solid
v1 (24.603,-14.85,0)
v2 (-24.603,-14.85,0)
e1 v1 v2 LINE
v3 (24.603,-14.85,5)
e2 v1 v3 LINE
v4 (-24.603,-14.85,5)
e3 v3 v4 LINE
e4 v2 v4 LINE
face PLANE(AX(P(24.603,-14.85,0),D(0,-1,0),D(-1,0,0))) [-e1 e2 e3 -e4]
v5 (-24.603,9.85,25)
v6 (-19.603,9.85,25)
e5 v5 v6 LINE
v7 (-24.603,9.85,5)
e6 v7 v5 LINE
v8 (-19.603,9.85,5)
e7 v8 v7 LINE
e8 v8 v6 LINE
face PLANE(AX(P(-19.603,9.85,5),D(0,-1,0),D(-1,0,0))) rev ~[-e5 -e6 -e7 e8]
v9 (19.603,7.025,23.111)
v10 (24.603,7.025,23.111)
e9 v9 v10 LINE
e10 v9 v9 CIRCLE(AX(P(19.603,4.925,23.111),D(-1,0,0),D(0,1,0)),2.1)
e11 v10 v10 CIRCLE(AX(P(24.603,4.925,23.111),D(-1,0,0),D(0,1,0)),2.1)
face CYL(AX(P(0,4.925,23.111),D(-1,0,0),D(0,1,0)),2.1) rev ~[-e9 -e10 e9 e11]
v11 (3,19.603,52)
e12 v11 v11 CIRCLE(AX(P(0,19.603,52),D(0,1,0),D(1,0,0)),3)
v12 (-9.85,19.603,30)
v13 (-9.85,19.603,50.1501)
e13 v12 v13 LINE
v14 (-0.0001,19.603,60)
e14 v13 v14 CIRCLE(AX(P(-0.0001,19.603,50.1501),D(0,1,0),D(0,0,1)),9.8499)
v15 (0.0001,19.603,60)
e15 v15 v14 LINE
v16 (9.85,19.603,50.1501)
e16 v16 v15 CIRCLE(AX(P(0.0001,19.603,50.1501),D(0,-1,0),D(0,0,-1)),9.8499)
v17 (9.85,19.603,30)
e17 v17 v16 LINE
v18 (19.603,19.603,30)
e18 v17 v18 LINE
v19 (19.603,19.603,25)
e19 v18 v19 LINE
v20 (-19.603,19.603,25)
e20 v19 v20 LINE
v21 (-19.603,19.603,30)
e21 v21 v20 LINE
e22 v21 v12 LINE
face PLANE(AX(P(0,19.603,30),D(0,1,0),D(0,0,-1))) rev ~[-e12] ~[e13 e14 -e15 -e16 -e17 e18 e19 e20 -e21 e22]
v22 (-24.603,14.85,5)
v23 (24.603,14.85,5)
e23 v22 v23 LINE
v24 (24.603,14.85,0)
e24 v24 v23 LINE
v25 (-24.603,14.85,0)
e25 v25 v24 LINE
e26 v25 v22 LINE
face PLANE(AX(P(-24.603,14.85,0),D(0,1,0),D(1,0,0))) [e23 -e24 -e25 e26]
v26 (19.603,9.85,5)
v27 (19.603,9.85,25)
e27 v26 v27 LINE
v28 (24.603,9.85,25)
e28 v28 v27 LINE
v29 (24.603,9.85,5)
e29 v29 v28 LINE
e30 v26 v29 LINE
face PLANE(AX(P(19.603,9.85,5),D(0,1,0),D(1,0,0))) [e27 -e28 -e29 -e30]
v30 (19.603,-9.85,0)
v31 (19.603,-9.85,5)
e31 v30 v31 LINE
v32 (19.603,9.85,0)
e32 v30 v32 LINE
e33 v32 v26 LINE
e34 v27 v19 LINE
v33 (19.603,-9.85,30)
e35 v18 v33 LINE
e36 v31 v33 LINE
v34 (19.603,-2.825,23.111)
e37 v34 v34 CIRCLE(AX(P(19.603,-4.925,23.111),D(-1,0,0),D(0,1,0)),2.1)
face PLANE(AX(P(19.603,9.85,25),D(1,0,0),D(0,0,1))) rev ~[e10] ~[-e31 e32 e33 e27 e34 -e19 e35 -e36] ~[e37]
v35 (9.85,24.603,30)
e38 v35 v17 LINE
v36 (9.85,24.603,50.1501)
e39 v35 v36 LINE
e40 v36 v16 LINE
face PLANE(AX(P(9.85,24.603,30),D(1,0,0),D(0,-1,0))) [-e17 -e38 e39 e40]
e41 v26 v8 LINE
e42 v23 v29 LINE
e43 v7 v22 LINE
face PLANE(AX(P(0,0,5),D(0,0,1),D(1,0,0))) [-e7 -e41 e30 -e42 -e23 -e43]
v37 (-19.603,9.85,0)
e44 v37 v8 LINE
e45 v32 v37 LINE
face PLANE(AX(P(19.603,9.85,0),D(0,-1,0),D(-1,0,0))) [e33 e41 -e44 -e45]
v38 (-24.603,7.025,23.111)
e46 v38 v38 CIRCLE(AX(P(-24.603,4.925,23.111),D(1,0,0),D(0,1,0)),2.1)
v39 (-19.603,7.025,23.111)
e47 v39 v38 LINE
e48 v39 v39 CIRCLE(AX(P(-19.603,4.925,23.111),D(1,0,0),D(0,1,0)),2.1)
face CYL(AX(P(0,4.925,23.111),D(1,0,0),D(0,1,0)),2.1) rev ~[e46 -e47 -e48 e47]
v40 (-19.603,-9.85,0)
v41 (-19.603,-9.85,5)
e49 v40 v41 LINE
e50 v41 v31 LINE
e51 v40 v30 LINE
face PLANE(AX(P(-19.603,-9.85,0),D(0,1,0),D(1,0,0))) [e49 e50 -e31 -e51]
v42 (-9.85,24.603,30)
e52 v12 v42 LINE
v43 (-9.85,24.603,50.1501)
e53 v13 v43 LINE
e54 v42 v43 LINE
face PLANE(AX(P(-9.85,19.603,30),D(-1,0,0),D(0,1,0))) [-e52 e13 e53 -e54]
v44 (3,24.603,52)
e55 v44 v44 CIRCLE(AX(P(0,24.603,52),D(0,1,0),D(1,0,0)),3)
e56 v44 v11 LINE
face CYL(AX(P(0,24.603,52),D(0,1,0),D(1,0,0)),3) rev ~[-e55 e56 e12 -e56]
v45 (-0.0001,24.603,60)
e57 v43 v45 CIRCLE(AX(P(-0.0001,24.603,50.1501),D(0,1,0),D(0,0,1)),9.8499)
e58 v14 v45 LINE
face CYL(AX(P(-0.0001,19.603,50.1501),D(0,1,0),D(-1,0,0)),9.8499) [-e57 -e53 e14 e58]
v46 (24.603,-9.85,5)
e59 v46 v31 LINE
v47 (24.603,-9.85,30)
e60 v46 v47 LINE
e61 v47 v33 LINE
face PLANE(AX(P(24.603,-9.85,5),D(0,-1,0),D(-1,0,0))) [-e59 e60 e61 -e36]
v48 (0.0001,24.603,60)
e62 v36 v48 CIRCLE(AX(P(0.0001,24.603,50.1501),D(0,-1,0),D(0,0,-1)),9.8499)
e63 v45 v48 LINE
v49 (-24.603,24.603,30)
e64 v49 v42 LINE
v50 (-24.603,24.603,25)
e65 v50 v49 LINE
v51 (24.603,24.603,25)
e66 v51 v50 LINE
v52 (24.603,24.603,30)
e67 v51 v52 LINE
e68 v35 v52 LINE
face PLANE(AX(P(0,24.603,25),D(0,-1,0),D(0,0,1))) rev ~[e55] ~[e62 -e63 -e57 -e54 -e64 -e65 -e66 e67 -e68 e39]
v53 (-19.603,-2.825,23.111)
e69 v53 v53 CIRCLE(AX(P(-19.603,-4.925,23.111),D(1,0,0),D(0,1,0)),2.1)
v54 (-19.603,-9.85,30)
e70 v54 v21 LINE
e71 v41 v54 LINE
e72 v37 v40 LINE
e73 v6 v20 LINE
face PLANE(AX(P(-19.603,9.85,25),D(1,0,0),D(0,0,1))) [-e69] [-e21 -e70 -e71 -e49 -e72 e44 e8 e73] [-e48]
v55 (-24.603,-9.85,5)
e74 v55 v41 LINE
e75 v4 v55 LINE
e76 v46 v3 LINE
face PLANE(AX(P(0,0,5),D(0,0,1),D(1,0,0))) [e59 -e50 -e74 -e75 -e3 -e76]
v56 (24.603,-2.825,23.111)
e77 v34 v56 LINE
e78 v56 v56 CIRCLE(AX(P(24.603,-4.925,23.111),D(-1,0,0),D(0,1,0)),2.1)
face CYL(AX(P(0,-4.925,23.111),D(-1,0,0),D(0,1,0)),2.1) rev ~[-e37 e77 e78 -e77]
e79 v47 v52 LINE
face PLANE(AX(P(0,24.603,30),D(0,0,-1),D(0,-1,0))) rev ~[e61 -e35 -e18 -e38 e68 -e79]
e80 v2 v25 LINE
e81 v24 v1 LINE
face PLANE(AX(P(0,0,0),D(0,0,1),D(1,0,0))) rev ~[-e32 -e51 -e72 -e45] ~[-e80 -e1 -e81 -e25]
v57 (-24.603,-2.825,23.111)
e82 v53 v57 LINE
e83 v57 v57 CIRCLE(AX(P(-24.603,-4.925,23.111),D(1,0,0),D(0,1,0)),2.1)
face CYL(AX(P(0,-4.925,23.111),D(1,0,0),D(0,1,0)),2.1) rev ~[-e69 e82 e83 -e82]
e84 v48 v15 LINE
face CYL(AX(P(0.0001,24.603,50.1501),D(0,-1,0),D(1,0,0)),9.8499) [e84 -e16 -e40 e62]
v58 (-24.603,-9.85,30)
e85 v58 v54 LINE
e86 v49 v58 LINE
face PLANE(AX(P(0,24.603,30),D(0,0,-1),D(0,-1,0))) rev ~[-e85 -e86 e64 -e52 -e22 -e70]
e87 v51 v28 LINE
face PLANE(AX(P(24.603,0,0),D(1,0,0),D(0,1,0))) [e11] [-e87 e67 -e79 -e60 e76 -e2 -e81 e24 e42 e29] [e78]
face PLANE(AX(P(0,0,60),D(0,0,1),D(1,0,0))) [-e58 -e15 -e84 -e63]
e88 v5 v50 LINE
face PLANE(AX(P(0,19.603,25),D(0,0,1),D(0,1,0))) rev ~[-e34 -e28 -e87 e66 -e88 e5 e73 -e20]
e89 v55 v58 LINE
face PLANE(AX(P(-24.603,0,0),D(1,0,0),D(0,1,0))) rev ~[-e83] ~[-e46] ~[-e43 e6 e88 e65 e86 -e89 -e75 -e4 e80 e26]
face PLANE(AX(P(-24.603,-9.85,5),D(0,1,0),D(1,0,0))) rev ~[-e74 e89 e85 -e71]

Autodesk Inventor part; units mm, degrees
ref_plane "YZ Plane" through (0, 0, 0) normal (1, 0, 0) x (0, 1, 0)
ref_plane "XZ Plane" through (0, 0, 0) normal (0, 1, 0) x (-1, 0, 0)
ref_plane "XY Plane" through (0, 0, 0) normal (0, 0, 1) x (1, 0, 0)
sketch "Sketch1" plane through (0, 0, 0) normal (0, 0, 1) x (1, 0, 0)
  line L0 (-19.603, -9.85) -> (19.603, -9.85)
  line L1 (19.603, -9.85) -> (19.603, 9.85)
  line L2 (19.603, 9.85) -> (-19.603, 9.85)
  line L3 (-19.603, 9.85) -> (-19.603, -9.85)
  line L4 (-19.603, -9.85) -> (19.603, 9.85) construction
  line L5 (19.603, -9.85) -> (-19.603, 9.85) construction
  line L6 (-24.603, 14.85) -> (24.603, 14.85)
  line L7 (24.603, 14.85) -> (24.603, -14.85)
  line L8 (24.603, -14.85) -> (-24.603, -14.85)
  line L9 (-24.603, -14.85) -> (-24.603, 14.85)
  point P0 (0, 0)
  dimension "d0" = 39.206
  dimension "d1" = 19.7
  dimension "d2" = 5
extrude "Extrusion1" add sketch "Sketch1" along normal blind 5
sketch "Sketch2" plane through (0, 0, 5) normal (0, 0, 1) x (1, 0, 0)
  line L0 (-24.603, 14.85) -> (-24.603, -14.85) construction
  line L1 (-24.603, 14.85) -> (-24.603, -14.85) construction
  line L2 (24.603, 14.85) -> (-24.603, 14.85) construction
  line L3 (-24.603, 14.85) -> (24.603, 14.85) construction
  line L4 (24.603, -14.85) -> (24.603, 14.85) construction
  line L5 (24.603, 14.85) -> (24.603, -14.85) construction
  line L6 (24.603, -14.85) -> (-24.603, -14.85) construction
  line L7 (-19.603, -9.85) -> (-19.603, 9.85) projected
  line L8 (-19.603, 9.85) -> (-24.603, 9.85)
  line L9 (-24.603, 9.85) -> (-24.603, -9.85)
  line L10 (-24.603, -9.85) -> (-19.603, -9.85)
  line L11 (-19.603, -9.85) -> (-19.603, 9.85)
  line L12 (19.603, 9.85) -> (19.603, -9.85) projected
  line L13 (19.603, 9.85) -> (24.603, 9.85)
  line L14 (24.603, 9.85) -> (24.603, -9.85)
  line L15 (24.603, -9.85) -> (19.603, -9.85)
  line L16 (19.603, -9.85) -> (19.603, 9.85)
  point P0 (0, 0)
extrude "Extrusion2" add sketch "Sketch2" along normal blind 25
sketch "Sketch3" plane through (0, 0, 0) normal (1, 0, 0) x (0, 1, 0)
  circle A0 centre (4.925, 23.111) radius 2.1
  line L0 (14.85, 0) -> (14.85, 5) projected
  line L1 (14.85, 5) -> (9.85, 5) projected
  circle A1 centre (-4.925, 23.111) radius 2.1
  line L2 (-14.85, 0) -> (-14.85, 5) projected
  line L3 (-9.85, 5) -> (-14.85, 5) projected
  point P0 (0, 0)
  point P1 (-12.35, 5)
  dimension "d7" = 4.2
  dimension "d8" = 9.925
  dimension "d9" = 18.111
  dimension "d10" = 4.2
  dimension "d11" = 9.925
  dimension "d12" = 18.111
extrude "Extrusion3" cut sketch "Sketch3" along normal through all both and the other way through all
sketch "Sketch4" plane through (0, 0, 0) normal (1, 0, 0) x (0, 1, 0)
  line L0 (-9.85, 30) -> (9.85, 30) construction
  line L1 (0, 30) -> (0, 0) construction
  line L2 (24.603, 30) -> (19.603, 30)
  line L3 (19.603, 30) -> (19.603, 25)
  line L4 (19.603, 25) -> (24.603, 25)
  line L5 (24.603, 25) -> (24.603, 30)
  line L6 (14.85, 0) -> (-14.85, 0) projected
  point P0 (19.603, 27.5)
  dimension "d29" = 5
  dimension "d30" = 5
  dimension "d31" = 19.603
  dimension "d32" = 25
extrude "Extrusion4" add sketch "Sketch4" along normal mid plane 49.206
sketch "Sketch5" plane through (0, 0, 30) normal (0, 0, 1) x (1, 0, 0)
  line L0 (-24.603, -9.85) -> (-24.603, 14.85) projected
  line L1 (24.603, -9.85) -> (24.603, 14.85) projected
  line L2 (-24.603, 24.603) -> (24.603, 24.603) projected
  line L3 (-9.85, 24.603) -> (9.85, 24.603)
  line L4 (9.85, 24.603) -> (9.85, 19.603)
  line L5 (9.85, 19.603) -> (-9.85, 19.603)
  line L6 (-9.85, 19.603) -> (-9.85, 24.603)
  line L7 (24.603, 24.603) -> (24.603, 19.603) projected
  line L8 (-24.603, 19.603) -> (-24.603, 24.603) projected
  point P0 (0, 0)
  point P1 (9.85, 22.103)
  point P2 (-24.603, 22.103)
  point P3 (9.85, 24.603)
  dimension "d33" = 19.7
  dimension "d34" = 5
  dimension "d35" = 14.753
  dimension "d36" = 14.753
extrude "Extrusion5" add sketch "Sketch5" along normal blind 30
sketch "Sketch7" plane through (19.603, 9.85, 5) normal (0, 1, 0) x (1, 0, 0)
  line L0 (-39.206, 0) -> (-39.206, -25) projected
  line L1 (-39.206, -25) -> (-44.206, -25)
  line L2 (-44.206, -25) -> (-44.206, -20)
  line L3 (-44.206, -20) -> (-39.206, -20)
  line L4 (-39.206, -20) -> (-39.206, -25)
  line L5 (0, 0) -> (0, -25) projected
  line L6 (0, -25) -> (5, -25)
  line L7 (5, -25) -> (5, -20)
  line L8 (5, -20) -> (0, -20)
  line L9 (0, -20) -> (0, -25)
  point P0 (-19.603, 5)
  dimension "d37" = 5
  dimension "d38" = 5
  dimension "d39" = 5
  dimension "d40" = 5
extrude "Extrusion7" add sketch "Sketch7" along normal through all
sketch "Sketch8" plane through (-24.603, 24.603, 25) normal (0, 1, 0) x (1, 0, 0)
  line L0 (14.753, -35) -> (34.453, -35) construction
  line L1 (24.603, -35) -> (24.603, 0) construction
  line L2 (5, 0) -> (44.206, 0) construction
  circle A0 centre (24.603, -27) radius 3
  point P0 (24.603, 25)
  dimension "d43" = 6
  dimension "d44" = 8
extrude "Extrusion8" cut sketch "Sketch8" against normal through all
fillet "Fillet1" radius 9.85 2 edges at (9.85, 22.103, 60) (-9.85, 22.103, 60)
properties part number "Part2_cage"
